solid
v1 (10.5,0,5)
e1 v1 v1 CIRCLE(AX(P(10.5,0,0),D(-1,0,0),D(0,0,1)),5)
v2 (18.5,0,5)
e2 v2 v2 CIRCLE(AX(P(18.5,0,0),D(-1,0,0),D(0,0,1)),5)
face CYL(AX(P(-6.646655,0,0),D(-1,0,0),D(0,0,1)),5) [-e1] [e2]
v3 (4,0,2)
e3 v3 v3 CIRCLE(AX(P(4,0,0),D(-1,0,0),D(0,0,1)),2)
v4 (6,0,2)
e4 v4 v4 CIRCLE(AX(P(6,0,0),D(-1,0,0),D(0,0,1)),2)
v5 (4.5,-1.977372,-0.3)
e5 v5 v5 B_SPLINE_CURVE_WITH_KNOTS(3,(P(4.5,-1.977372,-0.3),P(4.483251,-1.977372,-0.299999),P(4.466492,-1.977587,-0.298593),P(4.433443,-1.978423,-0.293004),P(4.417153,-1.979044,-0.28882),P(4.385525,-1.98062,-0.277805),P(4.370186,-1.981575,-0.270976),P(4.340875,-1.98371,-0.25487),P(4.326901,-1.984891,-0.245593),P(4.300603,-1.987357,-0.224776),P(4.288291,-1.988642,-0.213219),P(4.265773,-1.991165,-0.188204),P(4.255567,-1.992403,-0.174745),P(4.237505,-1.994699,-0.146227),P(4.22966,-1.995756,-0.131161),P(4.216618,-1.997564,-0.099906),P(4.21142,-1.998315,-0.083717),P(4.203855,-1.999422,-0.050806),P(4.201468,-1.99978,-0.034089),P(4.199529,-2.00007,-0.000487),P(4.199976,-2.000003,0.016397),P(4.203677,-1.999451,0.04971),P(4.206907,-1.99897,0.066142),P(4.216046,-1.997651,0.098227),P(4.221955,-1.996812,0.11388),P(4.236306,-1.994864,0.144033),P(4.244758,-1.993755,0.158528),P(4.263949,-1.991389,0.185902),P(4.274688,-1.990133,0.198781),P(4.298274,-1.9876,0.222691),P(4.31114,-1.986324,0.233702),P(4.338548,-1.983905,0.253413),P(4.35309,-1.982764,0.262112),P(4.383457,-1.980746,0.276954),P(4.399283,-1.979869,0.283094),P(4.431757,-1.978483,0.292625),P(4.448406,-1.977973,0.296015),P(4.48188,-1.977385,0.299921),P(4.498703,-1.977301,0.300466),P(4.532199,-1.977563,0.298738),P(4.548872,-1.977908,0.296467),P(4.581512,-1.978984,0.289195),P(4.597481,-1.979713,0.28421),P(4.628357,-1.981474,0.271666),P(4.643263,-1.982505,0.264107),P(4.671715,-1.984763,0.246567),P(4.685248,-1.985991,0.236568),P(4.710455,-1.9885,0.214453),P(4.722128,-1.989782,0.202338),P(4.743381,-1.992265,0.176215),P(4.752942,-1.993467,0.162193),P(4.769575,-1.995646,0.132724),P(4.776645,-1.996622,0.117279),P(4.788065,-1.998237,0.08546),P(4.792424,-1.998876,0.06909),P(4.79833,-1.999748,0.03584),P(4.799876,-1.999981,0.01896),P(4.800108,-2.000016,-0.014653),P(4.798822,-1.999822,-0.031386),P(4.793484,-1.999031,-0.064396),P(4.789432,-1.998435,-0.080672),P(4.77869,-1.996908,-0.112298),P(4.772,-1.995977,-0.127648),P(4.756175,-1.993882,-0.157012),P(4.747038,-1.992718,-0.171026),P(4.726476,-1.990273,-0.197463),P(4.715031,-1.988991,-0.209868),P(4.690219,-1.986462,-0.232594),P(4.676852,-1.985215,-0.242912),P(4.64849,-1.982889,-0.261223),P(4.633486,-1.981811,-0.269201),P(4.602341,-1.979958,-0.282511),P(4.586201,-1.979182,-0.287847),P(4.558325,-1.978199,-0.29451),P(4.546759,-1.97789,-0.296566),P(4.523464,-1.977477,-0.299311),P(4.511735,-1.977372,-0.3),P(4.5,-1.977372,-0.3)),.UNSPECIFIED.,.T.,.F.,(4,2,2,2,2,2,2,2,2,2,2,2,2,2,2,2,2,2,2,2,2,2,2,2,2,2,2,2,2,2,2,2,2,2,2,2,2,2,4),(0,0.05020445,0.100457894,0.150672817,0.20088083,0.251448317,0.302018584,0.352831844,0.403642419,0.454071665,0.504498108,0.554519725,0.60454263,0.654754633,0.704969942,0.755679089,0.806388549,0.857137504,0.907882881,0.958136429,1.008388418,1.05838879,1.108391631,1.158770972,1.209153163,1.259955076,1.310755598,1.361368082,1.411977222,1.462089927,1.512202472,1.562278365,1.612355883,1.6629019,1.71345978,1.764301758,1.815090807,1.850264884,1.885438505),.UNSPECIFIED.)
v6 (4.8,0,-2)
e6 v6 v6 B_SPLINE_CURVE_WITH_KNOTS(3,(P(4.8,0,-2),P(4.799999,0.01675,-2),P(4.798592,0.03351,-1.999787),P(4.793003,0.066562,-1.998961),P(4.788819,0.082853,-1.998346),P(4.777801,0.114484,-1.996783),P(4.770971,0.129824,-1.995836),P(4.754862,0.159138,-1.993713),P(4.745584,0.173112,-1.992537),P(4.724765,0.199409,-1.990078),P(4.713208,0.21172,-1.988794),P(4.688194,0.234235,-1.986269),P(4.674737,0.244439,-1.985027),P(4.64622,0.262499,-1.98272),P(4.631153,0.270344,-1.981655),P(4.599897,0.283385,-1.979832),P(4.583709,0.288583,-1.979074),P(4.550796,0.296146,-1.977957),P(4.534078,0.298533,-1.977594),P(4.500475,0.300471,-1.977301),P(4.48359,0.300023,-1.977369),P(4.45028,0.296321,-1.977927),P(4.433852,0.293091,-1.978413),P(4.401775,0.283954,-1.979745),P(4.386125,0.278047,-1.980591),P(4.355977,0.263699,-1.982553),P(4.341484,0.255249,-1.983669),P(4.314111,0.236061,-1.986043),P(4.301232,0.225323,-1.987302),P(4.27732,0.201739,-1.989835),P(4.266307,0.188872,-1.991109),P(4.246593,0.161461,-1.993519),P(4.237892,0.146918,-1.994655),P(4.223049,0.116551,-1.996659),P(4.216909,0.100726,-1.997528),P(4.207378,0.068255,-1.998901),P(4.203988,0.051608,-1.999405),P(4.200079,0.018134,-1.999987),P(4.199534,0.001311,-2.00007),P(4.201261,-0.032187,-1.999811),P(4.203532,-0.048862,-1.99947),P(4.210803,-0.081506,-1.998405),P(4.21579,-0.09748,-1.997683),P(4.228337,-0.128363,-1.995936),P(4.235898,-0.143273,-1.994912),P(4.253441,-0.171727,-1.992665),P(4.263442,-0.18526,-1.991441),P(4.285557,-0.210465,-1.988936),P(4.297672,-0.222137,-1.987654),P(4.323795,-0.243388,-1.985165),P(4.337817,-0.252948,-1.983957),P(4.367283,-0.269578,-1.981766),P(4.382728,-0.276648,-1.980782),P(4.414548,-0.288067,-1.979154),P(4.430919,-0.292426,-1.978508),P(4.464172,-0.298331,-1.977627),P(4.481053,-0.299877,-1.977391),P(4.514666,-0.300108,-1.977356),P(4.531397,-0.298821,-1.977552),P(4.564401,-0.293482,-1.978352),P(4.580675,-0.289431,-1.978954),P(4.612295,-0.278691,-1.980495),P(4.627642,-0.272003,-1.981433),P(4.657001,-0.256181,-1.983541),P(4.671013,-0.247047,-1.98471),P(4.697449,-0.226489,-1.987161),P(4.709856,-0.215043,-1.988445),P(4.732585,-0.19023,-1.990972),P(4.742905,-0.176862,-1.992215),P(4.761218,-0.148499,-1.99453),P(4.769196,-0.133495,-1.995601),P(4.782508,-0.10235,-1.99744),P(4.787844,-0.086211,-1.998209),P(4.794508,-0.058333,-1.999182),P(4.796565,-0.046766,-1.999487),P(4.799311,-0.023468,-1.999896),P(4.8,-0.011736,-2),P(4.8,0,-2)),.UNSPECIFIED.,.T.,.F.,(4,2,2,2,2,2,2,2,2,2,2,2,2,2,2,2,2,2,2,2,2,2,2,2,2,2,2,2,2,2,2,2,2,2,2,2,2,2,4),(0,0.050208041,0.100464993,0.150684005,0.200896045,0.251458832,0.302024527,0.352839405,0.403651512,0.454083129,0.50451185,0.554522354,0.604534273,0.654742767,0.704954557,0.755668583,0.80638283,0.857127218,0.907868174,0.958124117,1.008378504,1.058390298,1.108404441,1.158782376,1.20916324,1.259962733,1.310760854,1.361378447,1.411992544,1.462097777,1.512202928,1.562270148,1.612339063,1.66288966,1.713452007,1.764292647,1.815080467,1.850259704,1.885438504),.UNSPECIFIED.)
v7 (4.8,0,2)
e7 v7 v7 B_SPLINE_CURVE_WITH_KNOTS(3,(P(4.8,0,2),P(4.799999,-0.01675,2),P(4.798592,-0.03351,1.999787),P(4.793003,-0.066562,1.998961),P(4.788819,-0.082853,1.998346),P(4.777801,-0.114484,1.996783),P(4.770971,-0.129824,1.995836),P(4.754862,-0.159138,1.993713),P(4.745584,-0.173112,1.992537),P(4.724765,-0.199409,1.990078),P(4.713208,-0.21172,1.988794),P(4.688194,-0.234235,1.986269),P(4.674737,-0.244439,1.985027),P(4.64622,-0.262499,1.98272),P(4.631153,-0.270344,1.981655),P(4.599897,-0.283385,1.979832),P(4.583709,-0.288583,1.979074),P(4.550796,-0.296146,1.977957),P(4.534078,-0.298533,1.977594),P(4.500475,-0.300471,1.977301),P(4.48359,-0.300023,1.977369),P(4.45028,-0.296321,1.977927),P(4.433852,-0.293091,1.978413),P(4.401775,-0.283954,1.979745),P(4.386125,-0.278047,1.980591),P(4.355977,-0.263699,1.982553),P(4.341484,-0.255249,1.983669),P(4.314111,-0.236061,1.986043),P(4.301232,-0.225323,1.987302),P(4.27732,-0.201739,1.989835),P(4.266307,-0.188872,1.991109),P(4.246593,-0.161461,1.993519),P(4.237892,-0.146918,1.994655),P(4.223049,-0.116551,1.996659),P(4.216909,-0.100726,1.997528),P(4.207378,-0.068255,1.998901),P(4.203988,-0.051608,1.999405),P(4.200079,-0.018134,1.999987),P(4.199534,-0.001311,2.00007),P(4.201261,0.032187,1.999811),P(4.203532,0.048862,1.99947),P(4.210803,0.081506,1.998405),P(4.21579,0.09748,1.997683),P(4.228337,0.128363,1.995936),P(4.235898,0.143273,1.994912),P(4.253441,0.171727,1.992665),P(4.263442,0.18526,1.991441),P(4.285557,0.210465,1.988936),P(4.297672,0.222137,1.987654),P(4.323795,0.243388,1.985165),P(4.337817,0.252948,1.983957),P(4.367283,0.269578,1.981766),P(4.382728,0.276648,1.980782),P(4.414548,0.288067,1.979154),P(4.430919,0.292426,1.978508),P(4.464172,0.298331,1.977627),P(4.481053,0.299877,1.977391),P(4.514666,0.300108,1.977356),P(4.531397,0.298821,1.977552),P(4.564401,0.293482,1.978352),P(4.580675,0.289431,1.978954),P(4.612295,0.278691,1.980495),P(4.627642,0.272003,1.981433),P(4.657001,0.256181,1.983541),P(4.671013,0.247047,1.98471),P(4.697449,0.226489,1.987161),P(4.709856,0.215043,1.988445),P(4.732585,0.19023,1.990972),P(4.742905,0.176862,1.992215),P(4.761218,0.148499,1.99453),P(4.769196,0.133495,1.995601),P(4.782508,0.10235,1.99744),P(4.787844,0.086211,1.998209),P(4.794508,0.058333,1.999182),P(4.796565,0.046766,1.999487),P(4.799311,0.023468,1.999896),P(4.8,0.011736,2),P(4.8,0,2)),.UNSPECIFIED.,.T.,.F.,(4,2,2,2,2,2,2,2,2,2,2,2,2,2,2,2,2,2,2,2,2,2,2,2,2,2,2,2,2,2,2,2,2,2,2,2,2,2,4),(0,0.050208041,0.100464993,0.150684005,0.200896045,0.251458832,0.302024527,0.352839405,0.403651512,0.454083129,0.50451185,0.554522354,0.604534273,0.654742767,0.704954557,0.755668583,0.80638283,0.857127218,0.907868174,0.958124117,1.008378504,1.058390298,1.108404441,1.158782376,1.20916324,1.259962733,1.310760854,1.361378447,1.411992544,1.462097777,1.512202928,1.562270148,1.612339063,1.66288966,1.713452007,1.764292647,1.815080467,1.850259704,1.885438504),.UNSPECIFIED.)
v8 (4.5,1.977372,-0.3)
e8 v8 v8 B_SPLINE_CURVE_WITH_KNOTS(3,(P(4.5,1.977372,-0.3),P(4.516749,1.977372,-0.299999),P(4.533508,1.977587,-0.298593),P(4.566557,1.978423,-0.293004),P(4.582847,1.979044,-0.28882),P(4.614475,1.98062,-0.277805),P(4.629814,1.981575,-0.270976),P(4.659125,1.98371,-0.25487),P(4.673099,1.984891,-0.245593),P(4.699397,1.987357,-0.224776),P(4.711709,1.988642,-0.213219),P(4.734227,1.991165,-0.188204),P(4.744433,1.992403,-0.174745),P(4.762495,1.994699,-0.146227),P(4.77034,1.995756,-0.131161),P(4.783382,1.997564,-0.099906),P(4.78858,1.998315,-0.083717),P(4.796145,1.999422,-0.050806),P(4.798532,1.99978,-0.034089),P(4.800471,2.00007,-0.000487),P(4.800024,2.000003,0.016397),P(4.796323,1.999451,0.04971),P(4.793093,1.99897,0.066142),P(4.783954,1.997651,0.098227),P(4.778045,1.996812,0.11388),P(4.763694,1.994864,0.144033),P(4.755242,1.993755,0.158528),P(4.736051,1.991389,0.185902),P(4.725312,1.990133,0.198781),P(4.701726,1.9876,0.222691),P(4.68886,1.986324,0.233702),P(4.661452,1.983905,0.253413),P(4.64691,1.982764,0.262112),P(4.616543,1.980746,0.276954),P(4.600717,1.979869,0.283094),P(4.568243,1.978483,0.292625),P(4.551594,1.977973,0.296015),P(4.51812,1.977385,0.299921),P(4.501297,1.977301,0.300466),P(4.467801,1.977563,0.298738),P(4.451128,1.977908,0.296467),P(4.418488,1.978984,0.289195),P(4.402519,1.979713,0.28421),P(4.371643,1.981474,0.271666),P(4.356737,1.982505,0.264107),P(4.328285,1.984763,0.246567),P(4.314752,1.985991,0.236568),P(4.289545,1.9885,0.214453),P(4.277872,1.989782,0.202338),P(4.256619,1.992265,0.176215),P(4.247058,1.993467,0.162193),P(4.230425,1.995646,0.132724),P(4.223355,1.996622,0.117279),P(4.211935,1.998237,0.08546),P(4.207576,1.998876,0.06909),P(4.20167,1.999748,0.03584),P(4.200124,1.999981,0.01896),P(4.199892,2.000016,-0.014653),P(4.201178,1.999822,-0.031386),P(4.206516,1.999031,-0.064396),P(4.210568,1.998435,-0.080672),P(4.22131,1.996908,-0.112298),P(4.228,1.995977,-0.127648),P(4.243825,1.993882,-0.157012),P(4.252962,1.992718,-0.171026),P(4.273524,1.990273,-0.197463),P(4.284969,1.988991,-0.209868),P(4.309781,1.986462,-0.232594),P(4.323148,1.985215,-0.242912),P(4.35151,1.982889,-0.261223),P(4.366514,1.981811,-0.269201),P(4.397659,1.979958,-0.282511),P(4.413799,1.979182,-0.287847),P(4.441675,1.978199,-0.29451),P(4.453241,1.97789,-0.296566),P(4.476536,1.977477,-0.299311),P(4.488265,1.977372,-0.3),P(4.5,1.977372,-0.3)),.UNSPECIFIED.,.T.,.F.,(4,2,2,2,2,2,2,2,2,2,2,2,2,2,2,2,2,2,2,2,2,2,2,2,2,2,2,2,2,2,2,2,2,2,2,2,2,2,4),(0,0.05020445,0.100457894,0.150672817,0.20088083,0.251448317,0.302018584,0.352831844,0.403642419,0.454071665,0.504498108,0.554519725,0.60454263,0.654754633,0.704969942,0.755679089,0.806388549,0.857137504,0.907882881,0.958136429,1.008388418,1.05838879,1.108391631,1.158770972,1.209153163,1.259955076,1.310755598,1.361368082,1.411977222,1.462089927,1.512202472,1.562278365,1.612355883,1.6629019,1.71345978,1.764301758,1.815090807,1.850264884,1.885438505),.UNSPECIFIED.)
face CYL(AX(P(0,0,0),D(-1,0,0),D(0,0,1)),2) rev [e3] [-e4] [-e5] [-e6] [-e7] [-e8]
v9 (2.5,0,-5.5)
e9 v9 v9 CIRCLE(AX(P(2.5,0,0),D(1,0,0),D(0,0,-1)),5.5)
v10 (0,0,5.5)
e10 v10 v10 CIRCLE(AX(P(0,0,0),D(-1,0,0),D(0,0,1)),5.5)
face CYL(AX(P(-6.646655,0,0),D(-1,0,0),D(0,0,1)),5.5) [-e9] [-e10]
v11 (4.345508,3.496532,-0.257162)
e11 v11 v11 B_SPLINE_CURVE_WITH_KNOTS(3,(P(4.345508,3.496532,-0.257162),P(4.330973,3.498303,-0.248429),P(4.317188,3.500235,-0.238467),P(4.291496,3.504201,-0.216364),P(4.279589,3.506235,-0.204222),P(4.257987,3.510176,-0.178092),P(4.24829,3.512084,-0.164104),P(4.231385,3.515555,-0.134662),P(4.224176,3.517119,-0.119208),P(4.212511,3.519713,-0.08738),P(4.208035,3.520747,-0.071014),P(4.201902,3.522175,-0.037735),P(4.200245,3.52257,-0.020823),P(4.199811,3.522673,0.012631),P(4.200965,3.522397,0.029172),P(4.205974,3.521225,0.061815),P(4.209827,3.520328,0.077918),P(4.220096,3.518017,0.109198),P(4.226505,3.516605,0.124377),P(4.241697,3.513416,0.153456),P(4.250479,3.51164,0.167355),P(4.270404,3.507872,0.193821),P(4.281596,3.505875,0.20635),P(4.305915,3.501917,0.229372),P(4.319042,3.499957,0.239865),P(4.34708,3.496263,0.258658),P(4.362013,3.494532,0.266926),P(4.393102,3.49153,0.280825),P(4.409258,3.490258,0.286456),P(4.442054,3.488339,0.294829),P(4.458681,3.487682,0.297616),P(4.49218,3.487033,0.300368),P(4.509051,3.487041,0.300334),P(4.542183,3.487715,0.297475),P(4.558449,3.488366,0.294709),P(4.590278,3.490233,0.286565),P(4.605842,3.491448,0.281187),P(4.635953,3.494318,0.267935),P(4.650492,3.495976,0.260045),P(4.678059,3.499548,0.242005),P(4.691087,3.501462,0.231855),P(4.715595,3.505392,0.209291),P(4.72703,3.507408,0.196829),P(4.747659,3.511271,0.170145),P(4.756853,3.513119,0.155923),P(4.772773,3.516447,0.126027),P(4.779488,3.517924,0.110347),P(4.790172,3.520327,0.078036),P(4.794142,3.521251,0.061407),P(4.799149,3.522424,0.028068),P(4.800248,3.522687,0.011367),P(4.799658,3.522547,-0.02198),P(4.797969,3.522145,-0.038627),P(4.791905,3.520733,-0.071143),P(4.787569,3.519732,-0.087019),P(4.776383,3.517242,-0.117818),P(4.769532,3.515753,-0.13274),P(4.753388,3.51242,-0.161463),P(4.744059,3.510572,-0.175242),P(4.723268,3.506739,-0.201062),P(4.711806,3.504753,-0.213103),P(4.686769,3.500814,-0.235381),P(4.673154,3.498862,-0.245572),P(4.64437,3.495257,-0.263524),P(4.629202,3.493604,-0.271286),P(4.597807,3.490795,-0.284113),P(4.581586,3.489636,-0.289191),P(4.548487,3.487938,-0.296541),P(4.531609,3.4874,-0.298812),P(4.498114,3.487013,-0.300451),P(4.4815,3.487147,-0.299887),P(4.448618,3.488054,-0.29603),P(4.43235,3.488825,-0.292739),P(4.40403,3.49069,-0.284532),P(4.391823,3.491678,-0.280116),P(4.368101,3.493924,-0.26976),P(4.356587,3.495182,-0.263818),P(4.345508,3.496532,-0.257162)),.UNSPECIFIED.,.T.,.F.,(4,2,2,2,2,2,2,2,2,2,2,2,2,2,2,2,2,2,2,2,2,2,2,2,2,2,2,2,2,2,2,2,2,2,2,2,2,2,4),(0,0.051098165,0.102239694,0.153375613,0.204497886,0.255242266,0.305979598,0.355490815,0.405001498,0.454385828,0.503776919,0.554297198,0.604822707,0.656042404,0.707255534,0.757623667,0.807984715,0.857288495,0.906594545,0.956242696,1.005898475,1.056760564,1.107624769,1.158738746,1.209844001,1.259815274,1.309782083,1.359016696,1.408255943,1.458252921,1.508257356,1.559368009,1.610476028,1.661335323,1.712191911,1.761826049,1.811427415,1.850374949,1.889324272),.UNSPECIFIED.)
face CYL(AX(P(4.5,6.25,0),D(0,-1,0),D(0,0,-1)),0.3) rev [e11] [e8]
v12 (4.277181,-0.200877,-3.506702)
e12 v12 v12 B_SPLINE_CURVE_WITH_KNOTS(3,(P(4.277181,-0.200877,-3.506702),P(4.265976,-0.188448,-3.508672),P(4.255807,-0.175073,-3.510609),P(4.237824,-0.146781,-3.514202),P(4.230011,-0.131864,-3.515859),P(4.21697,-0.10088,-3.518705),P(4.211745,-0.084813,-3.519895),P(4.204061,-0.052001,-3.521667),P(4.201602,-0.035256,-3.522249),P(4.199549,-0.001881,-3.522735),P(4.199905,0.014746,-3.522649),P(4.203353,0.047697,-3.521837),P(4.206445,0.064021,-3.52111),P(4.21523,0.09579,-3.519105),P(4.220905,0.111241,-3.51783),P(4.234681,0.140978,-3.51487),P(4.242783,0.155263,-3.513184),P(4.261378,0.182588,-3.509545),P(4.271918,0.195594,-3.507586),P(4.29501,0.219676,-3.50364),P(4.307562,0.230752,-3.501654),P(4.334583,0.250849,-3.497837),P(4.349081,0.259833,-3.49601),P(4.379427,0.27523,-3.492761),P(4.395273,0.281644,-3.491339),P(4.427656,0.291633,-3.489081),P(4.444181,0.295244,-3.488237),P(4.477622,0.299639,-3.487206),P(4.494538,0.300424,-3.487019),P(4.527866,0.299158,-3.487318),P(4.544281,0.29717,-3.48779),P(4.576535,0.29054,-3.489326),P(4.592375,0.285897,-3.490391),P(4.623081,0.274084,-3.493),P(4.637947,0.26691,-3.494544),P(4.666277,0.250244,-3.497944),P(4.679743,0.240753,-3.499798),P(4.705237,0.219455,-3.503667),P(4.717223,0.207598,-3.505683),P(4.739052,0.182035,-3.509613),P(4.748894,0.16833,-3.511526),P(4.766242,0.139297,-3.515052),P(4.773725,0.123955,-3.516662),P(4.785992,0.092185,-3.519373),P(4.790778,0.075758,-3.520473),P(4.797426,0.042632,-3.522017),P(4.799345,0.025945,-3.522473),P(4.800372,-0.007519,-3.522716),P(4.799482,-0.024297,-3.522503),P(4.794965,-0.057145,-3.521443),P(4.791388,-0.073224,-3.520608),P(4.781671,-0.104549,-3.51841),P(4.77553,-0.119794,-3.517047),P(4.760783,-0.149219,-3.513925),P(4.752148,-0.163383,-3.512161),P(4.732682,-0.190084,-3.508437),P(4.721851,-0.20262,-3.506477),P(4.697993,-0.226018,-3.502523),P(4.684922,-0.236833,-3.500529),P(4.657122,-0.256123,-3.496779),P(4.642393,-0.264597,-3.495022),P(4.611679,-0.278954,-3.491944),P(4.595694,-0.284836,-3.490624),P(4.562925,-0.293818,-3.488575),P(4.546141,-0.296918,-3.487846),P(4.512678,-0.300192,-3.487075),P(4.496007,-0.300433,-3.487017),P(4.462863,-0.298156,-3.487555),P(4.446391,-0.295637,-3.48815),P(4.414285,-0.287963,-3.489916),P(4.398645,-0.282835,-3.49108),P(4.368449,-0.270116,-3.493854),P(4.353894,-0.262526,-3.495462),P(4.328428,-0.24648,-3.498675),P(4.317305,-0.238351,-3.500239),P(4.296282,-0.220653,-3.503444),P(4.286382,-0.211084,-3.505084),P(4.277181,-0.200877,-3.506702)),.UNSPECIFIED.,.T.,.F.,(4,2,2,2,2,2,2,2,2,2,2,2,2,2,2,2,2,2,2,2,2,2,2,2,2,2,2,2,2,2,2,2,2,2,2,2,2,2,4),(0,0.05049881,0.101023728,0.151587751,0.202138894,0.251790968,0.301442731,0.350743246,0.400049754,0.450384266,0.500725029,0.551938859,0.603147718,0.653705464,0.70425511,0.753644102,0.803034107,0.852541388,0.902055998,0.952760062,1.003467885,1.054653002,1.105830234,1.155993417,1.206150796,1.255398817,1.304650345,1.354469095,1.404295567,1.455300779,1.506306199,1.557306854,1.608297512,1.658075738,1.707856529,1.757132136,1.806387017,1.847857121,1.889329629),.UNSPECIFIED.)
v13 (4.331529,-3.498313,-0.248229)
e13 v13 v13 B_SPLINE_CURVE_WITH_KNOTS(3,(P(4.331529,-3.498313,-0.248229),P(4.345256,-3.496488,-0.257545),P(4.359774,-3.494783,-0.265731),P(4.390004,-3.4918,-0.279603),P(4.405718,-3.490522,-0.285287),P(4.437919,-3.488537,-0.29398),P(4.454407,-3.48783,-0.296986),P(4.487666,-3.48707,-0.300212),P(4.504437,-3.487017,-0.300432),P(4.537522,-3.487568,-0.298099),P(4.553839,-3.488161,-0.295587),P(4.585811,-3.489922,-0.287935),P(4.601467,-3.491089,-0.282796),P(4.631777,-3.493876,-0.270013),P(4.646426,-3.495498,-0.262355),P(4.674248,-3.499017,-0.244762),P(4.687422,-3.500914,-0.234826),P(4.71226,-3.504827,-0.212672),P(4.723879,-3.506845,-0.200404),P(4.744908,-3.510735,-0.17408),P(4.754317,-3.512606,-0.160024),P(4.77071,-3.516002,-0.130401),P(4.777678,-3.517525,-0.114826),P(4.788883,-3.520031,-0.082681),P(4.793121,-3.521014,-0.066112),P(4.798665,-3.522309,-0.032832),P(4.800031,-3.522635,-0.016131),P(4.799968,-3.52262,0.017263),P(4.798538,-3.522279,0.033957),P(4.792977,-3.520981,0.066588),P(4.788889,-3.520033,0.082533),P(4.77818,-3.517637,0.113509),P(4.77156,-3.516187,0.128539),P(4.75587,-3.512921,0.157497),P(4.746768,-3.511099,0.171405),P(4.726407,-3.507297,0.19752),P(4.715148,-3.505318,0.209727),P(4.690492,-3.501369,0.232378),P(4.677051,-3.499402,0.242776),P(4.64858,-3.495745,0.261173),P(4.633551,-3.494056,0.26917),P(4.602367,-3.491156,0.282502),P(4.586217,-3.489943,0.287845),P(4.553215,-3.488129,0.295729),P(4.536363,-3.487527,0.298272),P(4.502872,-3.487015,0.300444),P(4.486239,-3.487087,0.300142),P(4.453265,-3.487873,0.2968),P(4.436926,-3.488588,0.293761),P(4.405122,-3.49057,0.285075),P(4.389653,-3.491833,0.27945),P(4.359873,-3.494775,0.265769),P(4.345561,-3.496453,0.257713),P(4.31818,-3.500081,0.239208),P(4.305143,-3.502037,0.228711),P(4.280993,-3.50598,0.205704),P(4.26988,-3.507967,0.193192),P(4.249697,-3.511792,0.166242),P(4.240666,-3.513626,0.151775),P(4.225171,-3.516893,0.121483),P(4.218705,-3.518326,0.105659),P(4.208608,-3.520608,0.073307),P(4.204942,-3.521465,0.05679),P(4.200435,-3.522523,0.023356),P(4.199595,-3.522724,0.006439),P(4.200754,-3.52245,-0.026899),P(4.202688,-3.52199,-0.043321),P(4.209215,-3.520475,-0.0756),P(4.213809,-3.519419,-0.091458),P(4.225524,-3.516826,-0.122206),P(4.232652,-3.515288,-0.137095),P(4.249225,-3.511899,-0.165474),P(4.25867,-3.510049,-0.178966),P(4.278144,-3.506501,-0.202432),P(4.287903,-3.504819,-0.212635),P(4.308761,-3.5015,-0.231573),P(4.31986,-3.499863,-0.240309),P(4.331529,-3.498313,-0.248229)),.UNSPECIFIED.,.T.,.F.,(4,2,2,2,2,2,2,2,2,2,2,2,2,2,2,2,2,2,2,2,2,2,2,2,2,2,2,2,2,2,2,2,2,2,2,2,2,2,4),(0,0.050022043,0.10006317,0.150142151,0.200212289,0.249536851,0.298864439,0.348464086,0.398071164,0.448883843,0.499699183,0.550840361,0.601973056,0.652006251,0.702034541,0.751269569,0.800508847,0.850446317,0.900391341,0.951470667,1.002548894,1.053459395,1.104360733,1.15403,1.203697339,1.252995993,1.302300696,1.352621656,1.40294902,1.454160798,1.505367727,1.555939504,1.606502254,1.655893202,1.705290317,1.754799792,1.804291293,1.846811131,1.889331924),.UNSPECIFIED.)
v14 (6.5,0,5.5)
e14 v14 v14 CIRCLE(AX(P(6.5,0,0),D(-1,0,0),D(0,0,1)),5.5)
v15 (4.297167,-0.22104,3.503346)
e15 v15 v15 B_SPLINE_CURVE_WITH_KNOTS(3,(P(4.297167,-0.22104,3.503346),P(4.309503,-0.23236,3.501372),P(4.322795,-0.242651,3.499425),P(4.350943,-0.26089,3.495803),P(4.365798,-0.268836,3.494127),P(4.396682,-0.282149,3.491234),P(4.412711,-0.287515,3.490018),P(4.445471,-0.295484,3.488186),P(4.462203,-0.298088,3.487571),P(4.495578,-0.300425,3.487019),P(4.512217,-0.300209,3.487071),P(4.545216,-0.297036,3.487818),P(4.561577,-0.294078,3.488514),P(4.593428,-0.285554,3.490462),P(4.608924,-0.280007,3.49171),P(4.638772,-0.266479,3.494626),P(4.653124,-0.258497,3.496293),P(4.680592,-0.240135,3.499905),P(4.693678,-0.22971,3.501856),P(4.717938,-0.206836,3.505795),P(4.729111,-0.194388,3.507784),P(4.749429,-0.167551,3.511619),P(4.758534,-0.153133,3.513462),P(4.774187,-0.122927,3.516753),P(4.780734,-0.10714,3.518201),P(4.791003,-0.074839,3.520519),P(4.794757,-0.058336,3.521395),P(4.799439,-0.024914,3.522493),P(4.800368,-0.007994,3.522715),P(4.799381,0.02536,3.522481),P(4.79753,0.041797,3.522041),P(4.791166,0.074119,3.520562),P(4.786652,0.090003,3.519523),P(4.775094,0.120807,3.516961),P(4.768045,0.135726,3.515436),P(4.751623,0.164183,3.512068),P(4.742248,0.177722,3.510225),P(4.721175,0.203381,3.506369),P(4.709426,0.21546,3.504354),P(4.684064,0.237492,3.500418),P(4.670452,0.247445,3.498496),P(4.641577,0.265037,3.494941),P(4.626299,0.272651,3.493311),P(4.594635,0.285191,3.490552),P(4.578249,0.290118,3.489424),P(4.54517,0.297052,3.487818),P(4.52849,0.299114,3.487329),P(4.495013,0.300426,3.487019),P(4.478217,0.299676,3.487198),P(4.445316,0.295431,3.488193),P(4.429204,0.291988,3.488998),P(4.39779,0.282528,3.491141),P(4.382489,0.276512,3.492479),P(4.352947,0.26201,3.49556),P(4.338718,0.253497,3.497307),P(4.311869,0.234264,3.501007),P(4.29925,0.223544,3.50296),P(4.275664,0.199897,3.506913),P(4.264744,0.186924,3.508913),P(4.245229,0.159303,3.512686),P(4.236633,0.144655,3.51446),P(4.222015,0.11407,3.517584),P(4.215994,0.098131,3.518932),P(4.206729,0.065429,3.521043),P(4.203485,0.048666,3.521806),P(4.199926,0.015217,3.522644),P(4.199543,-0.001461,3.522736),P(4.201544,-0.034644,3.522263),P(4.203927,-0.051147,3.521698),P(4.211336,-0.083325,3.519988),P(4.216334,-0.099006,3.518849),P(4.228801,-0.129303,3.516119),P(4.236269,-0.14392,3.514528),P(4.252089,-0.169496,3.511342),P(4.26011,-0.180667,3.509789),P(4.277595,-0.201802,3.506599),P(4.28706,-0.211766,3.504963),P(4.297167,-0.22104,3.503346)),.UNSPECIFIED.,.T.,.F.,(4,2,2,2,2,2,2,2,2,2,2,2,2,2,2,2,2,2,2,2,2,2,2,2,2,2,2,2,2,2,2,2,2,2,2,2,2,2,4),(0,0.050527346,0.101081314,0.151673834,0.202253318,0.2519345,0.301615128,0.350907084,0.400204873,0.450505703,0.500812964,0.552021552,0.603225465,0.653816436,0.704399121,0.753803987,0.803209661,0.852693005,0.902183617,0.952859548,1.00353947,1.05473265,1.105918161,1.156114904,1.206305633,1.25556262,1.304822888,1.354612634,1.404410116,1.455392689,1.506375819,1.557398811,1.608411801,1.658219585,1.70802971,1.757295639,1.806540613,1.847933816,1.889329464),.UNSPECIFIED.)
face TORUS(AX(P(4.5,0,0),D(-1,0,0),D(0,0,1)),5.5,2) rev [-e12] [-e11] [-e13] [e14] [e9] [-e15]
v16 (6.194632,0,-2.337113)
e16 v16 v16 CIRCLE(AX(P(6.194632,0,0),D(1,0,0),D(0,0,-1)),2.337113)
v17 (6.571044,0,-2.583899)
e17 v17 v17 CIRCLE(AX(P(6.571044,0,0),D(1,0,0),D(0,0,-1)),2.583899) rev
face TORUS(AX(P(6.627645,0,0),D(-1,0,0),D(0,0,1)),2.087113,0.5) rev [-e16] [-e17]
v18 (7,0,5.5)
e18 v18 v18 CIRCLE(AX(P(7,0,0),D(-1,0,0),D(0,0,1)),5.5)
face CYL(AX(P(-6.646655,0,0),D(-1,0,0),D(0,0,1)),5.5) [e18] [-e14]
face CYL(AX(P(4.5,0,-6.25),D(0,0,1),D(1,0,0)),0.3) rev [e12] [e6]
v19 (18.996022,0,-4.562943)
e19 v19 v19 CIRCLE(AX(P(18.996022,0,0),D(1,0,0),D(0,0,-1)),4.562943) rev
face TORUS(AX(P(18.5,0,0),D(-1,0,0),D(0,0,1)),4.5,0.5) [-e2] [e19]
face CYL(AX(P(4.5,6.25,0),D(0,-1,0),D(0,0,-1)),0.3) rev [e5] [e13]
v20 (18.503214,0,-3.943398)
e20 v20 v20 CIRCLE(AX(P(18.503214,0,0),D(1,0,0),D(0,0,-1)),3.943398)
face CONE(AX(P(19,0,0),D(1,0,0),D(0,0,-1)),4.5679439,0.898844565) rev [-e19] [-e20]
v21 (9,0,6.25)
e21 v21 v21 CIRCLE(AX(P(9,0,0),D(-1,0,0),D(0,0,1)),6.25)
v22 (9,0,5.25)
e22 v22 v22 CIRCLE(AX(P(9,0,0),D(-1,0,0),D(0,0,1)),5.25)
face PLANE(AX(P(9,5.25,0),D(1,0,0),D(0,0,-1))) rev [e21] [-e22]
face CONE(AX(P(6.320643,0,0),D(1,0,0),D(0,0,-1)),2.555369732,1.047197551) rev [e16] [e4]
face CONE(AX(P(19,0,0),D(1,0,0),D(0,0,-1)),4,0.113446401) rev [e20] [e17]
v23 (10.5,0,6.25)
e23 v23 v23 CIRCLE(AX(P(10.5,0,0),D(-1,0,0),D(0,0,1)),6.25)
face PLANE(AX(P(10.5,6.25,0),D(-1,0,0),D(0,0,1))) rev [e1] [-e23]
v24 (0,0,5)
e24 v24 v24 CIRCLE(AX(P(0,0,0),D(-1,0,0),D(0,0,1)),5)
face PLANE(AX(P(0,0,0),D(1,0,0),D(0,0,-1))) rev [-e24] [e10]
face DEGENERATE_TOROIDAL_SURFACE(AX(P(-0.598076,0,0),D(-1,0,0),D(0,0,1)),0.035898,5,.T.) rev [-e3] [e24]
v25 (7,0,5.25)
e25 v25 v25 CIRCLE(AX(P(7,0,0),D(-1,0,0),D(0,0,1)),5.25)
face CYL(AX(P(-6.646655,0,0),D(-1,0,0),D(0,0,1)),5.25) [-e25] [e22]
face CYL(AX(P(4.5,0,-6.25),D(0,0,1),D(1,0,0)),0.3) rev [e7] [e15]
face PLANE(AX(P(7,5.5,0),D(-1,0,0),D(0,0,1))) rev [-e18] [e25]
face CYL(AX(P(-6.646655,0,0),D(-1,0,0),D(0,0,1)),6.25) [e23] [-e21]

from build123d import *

# Parameters (mm, degrees)
SKETCH_4_R               = 2
SKETCH_5_R               = 0.3
CUT_EXTRUDE_1_DEPTH      = 21.95530959
PATTERN_CIRCULAR_6_COUNT = 2
PATTERN_CIRCULAR_6_ANGLE = 90
FILLET_1_R               = 0.5
CHAMFER_1_SIZE           = 0.5679439
CHAMFER_1_SIZE_2         = 0.5
FILLET_2_R               = 0.5


with BuildPart() as part:
    # Эскиз1 → Повернуть31 (revolve)
    with BuildSketch(Plane.XY, mode=Mode.PRIVATE) as revolve_31_sk:
        Polygon((0, 0), (0, 5.5), (7, 5.5), (7, 5.25), (9, 5.25), (9, 6.25), (10.5, 6.25), (10.5, 5), (19, 5), (19, 0), align=None)
    revolve(revolve_31_sk.sketch.rotate(Axis((-6.646654946, 0, 0), (1, 0, 0)), 90), axis=Axis((-6.646654946, 0, 0), (1, 0, 0)))

    # Эскиз2 → Вырез-Повернуть2 (revolve, cut)
    with BuildSketch(Plane.XY, mode=Mode.PRIVATE) as cut_revolve_2_sk:
        with BuildLine():
            Line((0, 0), (19, 0))
            Line((19, 0), (19, 4))
            Line((19, 4), (6.320642864, 2.555369732))
            Line((6.320642864, 2.555369732), (6, 2))
            Line((6, 2), (4, 2))
            ThreePointArc((4, 2), (2.401923789, 4.035898385), (0, 5))
            Line((0, 5), (0, 0))
        make_face()
    revolve(cut_revolve_2_sk.sketch.rotate(Axis((0, 0, 0), (1, 0, 0)), 90), axis=Axis((0, 0, 0), (1, 0, 0)), mode=Mode.SUBTRACT)

    # Эскиз4 → Вырез-Повернуть3 (revolve, cut)
    with BuildSketch(Plane.XY, mode=Mode.PRIVATE) as cut_revolve_3_sk:
        with Locations((4.5, 5.5)):
            Circle(SKETCH_4_R)
    revolve(cut_revolve_3_sk.sketch.rotate(Axis((0, 0, 0), (1, 0, 0)), 90), axis=Axis((0, 0, 0), (1, 0, 0)), mode=Mode.SUBTRACT)

    # Эскиз5 → Вырез-Вытянуть1 (cut, symmetric)
    with BuildSketch(Plane.XY):
        with Locations(Location((4.5, 0, 0), (0, 0, 180))):
            Circle(SKETCH_5_R)
    cut_extrude_1 = extrude(amount=CUT_EXTRUDE_1_DEPTH, both=True, mode=Mode.SUBTRACT)

    # Круговой массив6: Вырез-Вытянуть1 ×2 about axis
    pattern_circular_6_axis = Axis((-6.646654946, 0, 0), (-1, 0, 0))
    for i in range(1, PATTERN_CIRCULAR_6_COUNT):
        add(cut_extrude_1.rotate(pattern_circular_6_axis, i * PATTERN_CIRCULAR_6_ANGLE / (PATTERN_CIRCULAR_6_COUNT - 1)), mode=Mode.SUBTRACT)

    # Скругление1
    fillet_1_edges = [part.edges().sort_by_distance(p)[0] for p in [
        (19, 0, -5),
    ]]
    fillet(fillet_1_edges, radius=FILLET_1_R)

    # Фаска1
    # the kernel refuses this chamfer: 0.5679439, 0.5 mm, written as the material it takes off along each edge
    with BuildSketch(Plane(origin=(19, 0, 0), x_dir=(0, 0, 1), z_dir=(0, 1, 0))) as chamfer_1_piece_1:
        Polygon((4 + CHAMFER_1_SIZE, 0), (4 - CHAMFER_1_SIZE_2 * 0.113203213768, -CHAMFER_1_SIZE_2 * 0.993571855677), (4, 0), align=None)
    revolve(axis=Axis((19, 0, 0), (1, 0, 0)), mode=Mode.SUBTRACT)

    # Скругление2
    fillet_2_edges = [part.edges().sort_by_distance(p)[0] for p in [
        (6.320642864, 0, -2.555369732),
    ]]
    fillet(fillet_2_edges, radius=FILLET_2_R)


solid = part.part
